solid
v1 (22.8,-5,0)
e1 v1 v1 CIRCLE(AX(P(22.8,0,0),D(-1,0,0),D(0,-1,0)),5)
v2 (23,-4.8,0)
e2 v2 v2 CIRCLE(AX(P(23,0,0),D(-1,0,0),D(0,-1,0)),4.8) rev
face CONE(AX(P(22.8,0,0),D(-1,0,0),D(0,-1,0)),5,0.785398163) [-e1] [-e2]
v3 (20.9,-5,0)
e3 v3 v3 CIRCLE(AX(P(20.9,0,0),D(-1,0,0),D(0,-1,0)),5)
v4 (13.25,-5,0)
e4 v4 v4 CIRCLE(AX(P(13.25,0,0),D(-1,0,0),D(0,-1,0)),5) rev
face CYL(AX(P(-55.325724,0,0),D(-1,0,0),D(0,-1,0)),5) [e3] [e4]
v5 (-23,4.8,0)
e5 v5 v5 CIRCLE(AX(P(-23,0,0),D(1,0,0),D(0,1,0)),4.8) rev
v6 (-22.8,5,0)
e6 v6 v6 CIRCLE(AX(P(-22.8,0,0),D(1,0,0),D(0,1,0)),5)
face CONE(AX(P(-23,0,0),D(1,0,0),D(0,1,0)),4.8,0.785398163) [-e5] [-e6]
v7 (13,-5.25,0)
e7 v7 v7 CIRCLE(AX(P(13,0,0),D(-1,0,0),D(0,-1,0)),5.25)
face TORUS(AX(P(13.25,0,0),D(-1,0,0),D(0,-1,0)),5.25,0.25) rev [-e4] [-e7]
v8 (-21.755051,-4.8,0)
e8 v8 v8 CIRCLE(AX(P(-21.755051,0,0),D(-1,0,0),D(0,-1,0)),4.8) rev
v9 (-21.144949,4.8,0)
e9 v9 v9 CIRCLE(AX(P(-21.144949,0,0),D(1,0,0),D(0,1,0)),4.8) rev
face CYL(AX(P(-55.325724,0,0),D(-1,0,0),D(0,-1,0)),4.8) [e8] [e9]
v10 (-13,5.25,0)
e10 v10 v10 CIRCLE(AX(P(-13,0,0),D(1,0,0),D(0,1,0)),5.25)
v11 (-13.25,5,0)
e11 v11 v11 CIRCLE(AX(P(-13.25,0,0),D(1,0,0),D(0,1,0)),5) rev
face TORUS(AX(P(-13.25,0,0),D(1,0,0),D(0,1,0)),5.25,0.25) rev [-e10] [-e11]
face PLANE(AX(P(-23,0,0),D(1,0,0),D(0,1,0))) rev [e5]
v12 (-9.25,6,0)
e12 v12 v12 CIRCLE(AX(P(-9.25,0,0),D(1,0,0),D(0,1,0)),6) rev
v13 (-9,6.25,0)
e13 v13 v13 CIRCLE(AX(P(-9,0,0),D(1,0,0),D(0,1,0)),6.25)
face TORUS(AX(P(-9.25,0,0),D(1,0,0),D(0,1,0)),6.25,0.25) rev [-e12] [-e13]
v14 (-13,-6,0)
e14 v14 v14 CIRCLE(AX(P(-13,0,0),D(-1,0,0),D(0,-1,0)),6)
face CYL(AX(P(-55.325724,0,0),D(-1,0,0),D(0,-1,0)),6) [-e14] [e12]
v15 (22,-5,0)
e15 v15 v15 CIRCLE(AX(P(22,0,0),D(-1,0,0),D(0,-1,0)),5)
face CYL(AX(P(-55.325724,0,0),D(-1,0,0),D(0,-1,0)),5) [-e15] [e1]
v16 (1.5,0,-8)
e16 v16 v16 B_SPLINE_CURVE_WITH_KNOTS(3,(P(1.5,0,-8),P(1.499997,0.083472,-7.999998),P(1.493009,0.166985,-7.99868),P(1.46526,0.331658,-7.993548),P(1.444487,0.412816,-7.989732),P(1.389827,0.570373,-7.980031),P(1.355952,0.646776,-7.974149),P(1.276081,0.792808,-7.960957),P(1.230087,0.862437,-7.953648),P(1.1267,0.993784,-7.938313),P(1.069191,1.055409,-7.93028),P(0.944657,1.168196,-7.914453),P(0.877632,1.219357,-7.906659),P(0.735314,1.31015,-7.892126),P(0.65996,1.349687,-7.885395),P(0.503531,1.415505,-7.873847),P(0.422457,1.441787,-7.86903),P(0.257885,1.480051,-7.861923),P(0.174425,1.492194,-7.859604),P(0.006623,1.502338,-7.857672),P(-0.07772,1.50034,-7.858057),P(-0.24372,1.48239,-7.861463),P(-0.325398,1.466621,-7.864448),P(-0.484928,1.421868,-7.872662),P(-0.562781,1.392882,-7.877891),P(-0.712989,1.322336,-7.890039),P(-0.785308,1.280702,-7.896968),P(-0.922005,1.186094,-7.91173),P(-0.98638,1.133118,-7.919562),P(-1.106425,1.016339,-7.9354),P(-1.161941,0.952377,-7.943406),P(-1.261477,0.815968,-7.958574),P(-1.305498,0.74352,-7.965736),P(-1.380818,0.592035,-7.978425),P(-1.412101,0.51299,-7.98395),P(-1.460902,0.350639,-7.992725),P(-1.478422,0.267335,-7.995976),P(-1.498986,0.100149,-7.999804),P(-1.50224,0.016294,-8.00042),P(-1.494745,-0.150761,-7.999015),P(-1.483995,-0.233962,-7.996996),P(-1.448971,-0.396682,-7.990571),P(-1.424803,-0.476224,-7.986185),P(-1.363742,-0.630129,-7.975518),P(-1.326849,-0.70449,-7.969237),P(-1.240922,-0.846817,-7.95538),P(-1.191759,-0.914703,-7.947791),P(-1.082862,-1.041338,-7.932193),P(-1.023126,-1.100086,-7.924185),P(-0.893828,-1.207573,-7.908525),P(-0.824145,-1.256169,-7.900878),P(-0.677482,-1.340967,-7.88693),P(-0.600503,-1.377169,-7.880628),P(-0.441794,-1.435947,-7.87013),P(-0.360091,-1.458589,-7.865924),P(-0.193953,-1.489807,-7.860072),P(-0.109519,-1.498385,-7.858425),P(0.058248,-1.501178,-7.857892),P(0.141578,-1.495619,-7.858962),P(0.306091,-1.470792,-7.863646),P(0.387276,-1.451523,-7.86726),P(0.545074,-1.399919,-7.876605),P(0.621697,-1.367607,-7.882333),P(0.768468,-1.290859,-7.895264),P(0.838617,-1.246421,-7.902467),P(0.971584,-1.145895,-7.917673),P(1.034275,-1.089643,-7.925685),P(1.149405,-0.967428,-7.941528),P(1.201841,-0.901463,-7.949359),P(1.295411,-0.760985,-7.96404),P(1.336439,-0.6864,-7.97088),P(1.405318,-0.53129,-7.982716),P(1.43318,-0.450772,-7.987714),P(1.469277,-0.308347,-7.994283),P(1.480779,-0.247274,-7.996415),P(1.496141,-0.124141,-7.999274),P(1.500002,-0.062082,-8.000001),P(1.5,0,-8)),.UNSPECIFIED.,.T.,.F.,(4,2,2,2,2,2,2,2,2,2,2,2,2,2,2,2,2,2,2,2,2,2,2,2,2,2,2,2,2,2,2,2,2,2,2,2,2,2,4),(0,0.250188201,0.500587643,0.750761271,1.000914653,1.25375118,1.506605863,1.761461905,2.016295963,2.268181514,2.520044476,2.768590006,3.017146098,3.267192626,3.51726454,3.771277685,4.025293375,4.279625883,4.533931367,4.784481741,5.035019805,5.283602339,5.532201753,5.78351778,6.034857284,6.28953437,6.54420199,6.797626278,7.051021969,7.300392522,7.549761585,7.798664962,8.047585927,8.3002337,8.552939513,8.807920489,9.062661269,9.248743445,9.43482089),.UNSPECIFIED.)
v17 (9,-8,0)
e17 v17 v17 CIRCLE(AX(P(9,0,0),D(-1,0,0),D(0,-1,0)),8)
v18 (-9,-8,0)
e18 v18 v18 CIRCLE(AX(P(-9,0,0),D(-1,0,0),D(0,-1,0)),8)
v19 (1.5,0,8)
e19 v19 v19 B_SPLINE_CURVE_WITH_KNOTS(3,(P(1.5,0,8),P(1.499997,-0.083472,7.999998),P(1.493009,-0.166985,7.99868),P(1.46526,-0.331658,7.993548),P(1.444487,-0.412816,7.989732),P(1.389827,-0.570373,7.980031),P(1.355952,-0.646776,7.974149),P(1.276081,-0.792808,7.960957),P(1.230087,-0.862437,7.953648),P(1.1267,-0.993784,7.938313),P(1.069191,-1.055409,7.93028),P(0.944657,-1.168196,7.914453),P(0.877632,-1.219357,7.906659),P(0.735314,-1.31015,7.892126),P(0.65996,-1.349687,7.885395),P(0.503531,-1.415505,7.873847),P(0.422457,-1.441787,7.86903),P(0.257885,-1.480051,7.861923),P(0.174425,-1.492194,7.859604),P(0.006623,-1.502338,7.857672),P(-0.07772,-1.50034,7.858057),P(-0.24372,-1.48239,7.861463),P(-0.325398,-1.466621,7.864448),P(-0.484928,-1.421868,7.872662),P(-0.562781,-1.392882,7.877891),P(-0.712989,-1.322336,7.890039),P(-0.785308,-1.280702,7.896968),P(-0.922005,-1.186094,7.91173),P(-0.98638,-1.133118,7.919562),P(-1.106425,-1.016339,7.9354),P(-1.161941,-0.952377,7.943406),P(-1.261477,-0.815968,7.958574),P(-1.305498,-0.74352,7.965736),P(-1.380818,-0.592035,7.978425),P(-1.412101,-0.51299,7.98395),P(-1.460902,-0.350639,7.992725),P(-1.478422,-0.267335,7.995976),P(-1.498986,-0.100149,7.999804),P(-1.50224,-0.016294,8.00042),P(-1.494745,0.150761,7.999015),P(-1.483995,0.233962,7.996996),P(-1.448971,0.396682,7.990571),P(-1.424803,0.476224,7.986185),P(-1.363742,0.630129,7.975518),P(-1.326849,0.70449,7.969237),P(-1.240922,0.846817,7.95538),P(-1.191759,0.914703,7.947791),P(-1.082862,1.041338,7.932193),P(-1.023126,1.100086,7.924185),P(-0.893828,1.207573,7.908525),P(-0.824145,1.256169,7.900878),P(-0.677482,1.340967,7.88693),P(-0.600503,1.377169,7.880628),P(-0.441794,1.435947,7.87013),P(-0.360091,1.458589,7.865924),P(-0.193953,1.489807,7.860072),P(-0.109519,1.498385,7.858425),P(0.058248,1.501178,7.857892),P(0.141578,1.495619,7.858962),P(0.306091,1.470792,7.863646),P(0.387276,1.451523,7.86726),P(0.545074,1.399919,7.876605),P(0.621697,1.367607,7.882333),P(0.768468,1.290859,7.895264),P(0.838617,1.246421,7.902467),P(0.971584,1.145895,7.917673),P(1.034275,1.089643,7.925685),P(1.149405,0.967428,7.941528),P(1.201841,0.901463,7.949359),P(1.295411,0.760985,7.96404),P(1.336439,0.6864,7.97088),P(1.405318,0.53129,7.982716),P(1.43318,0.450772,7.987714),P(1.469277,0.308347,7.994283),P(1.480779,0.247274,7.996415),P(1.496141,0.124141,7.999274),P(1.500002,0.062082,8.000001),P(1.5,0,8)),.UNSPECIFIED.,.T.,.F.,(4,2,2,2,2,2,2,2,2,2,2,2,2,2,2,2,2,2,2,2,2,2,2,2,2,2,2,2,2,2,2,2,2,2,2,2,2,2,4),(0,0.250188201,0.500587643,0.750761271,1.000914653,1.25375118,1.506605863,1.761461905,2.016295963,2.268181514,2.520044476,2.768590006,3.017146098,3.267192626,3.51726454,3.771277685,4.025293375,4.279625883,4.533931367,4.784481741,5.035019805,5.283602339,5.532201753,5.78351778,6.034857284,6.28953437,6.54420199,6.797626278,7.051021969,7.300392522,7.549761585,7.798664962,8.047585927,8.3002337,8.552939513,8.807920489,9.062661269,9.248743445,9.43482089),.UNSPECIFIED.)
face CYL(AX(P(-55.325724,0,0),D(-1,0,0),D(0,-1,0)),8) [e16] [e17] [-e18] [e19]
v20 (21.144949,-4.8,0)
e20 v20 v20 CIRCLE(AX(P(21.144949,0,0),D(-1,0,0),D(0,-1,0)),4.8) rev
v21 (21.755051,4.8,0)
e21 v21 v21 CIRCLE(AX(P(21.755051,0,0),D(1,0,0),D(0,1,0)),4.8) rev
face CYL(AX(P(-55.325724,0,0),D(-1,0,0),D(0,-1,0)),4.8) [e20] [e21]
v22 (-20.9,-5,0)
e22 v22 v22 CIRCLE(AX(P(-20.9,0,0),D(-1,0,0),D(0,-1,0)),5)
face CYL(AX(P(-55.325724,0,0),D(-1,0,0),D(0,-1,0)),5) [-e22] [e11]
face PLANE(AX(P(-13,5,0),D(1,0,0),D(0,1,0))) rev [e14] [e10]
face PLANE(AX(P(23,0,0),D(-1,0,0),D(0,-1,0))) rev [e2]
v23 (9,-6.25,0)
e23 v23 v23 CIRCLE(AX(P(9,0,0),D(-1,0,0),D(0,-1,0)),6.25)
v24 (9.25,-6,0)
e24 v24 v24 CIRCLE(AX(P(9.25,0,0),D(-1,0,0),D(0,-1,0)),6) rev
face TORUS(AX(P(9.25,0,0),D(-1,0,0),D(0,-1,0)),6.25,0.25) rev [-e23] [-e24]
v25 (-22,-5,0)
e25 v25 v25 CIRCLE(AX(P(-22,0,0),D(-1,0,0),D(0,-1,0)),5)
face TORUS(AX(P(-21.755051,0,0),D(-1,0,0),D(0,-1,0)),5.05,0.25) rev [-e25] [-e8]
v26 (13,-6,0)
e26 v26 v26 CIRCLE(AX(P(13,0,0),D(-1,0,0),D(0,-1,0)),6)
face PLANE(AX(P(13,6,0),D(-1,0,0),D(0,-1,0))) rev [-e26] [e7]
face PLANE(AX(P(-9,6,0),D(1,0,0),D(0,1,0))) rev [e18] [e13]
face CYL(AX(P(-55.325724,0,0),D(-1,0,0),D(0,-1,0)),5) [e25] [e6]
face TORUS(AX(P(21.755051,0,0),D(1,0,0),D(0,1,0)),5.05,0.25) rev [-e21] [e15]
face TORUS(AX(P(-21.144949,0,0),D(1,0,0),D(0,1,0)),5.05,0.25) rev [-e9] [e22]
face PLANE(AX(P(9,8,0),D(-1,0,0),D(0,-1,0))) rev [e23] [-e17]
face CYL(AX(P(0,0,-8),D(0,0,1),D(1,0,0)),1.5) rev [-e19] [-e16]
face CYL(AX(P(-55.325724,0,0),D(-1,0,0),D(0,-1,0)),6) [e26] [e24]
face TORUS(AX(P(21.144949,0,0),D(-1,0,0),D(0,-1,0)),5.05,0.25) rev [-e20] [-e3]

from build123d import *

# Parameters (mm, degrees)
SKETCH2_R          = 1.5
CUT_EXTRUDE1_DEPTH = 30.137604569
FILLET2_R          = 0.25
FILLET3_R          = 0.25
CHAMFER1_SIZE      = 0.2


with BuildPart() as part:
    # Sketch1 → Revolve1 (revolve)
    with BuildSketch(Plane.XY, mode=Mode.PRIVATE) as revolve1_sk:
        Polygon((-23, 0), (-23, 5), (-22, 5), (-22, 4.8), (-20.9, 4.8), (-20.9, 5), (-13, 5), (-13, 6), (-9, 6), (-9, 8), (9, 8), (9, 6), (13, 6), (13, 5), (20.9, 5), (20.9, 4.8), (22, 4.8), (22, 5), (23, 5), (23, 0), align=None)
    revolve(revolve1_sk.sketch.rotate(Axis((-55.325724278, 0, 0), (1, 0, 0)), 180), axis=Axis((-55.325724278, 0, 0), (1, 0, 0)))

    # Sketch2 → Cut-Extrude1 (cut, through all)
    with BuildSketch(Plane.XY.offset(8)):
        Circle(SKETCH2_R)
    extrude(amount=-CUT_EXTRUDE1_DEPTH, mode=Mode.SUBTRACT)

    # Fillet2
    # the kernel refuses this fillet: 0.25 mm, written as the material it adds along each edge
    with BuildSketch(Plane(origin=(-22, 0, 0), x_dir=(0, -1, 0), z_dir=(0, 0, 1))) as fillet2_piece_1:
        with BuildLine():
            CenterArc((5.05, 0.244948974), FILLET2_R, 180, 78.463040967)
            Line((4.8, 0.244948974), (4.795, 0.244948974))
            Line((4.795, 0.244948974), (4.795, 0))
            Line((4.795, 0), (4.8, -0.005))
            ThreePointArc((4.8, -0.005), (4.9, -0.005), (4.999, -0.004898979))
            Line((4.999, -0.004898979), (5, 0))
        make_face()
    revolve(axis=Axis((-22, 0, 0), (1, 0, 0)))
    with BuildSketch(Plane(origin=(-20.9, 0, 0), x_dir=(0, -1, 0), z_dir=(0, 0, 1))) as fillet2_piece_2:
        with BuildLine():
            CenterArc((5.05, -0.244948974), FILLET2_R, 101.536959033, 78.463040967)
            Line((5, 0), (4.999, 0.004898979))
            ThreePointArc((4.999, 0.004898979), (4.9, 0.005), (4.8, 0.005))
            Line((4.8, 0.005), (4.795, 0))
            Line((4.795, 0), (4.795, -0.244948974))
            Line((4.795, -0.244948974), (4.8, -0.244948974))
        make_face()
    revolve(axis=Axis((-20.9, 0, 0), (1, 0, 0)))
    with BuildSketch(Plane(origin=(20.9, 0, 0), x_dir=(0, -1, 0), z_dir=(0, 0, 1))) as fillet2_piece_3:
        with BuildLine():
            CenterArc((5.05, 0.244948974), FILLET2_R, 180, 78.463040967)
            Line((4.8, 0.244948974), (4.795, 0.244948974))
            Line((4.795, 0.244948974), (4.795, 0))
            Line((4.795, 0), (4.8, -0.005))
            ThreePointArc((4.8, -0.005), (4.9, -0.005), (4.999, -0.004898979))
            Line((4.999, -0.004898979), (5, 0))
        make_face()
    revolve(axis=Axis((20.9, 0, 0), (1, 0, 0)))
    with BuildSketch(Plane(origin=(22, 0, 0), x_dir=(0, -1, 0), z_dir=(0, 0, 1))) as fillet2_piece_4:
        with BuildLine():
            CenterArc((5.05, -0.244948974), FILLET2_R, 101.536959033, 78.463040967)
            Line((5, 0), (4.999, 0.004898979))
            ThreePointArc((4.999, 0.004898979), (4.9, 0.005), (4.8, 0.005))
            Line((4.8, 0.005), (4.795, 0))
            Line((4.795, 0), (4.795, -0.244948974))
            Line((4.795, -0.244948974), (4.8, -0.244948974))
        make_face()
    revolve(axis=Axis((22, 0, 0), (1, 0, 0)))

    # Fillet3
    fillet3_edges = [part.edges().sort_by_distance(p)[0] for p in [
        (-13, 5, 0),
        (-9, 6, 0),
        (9, 6, 0),
        (13, 5, 0),
    ]]
    fillet(fillet3_edges, radius=FILLET3_R)

    # Chamfer1
    chamfer1_edges = [part.edges().sort_by_distance(p)[0] for p in [
        (23, 5, 0),
        (-23, 5, 0),
    ]]
    chamfer(chamfer1_edges, length=CHAMFER1_SIZE)


solid = part.part
